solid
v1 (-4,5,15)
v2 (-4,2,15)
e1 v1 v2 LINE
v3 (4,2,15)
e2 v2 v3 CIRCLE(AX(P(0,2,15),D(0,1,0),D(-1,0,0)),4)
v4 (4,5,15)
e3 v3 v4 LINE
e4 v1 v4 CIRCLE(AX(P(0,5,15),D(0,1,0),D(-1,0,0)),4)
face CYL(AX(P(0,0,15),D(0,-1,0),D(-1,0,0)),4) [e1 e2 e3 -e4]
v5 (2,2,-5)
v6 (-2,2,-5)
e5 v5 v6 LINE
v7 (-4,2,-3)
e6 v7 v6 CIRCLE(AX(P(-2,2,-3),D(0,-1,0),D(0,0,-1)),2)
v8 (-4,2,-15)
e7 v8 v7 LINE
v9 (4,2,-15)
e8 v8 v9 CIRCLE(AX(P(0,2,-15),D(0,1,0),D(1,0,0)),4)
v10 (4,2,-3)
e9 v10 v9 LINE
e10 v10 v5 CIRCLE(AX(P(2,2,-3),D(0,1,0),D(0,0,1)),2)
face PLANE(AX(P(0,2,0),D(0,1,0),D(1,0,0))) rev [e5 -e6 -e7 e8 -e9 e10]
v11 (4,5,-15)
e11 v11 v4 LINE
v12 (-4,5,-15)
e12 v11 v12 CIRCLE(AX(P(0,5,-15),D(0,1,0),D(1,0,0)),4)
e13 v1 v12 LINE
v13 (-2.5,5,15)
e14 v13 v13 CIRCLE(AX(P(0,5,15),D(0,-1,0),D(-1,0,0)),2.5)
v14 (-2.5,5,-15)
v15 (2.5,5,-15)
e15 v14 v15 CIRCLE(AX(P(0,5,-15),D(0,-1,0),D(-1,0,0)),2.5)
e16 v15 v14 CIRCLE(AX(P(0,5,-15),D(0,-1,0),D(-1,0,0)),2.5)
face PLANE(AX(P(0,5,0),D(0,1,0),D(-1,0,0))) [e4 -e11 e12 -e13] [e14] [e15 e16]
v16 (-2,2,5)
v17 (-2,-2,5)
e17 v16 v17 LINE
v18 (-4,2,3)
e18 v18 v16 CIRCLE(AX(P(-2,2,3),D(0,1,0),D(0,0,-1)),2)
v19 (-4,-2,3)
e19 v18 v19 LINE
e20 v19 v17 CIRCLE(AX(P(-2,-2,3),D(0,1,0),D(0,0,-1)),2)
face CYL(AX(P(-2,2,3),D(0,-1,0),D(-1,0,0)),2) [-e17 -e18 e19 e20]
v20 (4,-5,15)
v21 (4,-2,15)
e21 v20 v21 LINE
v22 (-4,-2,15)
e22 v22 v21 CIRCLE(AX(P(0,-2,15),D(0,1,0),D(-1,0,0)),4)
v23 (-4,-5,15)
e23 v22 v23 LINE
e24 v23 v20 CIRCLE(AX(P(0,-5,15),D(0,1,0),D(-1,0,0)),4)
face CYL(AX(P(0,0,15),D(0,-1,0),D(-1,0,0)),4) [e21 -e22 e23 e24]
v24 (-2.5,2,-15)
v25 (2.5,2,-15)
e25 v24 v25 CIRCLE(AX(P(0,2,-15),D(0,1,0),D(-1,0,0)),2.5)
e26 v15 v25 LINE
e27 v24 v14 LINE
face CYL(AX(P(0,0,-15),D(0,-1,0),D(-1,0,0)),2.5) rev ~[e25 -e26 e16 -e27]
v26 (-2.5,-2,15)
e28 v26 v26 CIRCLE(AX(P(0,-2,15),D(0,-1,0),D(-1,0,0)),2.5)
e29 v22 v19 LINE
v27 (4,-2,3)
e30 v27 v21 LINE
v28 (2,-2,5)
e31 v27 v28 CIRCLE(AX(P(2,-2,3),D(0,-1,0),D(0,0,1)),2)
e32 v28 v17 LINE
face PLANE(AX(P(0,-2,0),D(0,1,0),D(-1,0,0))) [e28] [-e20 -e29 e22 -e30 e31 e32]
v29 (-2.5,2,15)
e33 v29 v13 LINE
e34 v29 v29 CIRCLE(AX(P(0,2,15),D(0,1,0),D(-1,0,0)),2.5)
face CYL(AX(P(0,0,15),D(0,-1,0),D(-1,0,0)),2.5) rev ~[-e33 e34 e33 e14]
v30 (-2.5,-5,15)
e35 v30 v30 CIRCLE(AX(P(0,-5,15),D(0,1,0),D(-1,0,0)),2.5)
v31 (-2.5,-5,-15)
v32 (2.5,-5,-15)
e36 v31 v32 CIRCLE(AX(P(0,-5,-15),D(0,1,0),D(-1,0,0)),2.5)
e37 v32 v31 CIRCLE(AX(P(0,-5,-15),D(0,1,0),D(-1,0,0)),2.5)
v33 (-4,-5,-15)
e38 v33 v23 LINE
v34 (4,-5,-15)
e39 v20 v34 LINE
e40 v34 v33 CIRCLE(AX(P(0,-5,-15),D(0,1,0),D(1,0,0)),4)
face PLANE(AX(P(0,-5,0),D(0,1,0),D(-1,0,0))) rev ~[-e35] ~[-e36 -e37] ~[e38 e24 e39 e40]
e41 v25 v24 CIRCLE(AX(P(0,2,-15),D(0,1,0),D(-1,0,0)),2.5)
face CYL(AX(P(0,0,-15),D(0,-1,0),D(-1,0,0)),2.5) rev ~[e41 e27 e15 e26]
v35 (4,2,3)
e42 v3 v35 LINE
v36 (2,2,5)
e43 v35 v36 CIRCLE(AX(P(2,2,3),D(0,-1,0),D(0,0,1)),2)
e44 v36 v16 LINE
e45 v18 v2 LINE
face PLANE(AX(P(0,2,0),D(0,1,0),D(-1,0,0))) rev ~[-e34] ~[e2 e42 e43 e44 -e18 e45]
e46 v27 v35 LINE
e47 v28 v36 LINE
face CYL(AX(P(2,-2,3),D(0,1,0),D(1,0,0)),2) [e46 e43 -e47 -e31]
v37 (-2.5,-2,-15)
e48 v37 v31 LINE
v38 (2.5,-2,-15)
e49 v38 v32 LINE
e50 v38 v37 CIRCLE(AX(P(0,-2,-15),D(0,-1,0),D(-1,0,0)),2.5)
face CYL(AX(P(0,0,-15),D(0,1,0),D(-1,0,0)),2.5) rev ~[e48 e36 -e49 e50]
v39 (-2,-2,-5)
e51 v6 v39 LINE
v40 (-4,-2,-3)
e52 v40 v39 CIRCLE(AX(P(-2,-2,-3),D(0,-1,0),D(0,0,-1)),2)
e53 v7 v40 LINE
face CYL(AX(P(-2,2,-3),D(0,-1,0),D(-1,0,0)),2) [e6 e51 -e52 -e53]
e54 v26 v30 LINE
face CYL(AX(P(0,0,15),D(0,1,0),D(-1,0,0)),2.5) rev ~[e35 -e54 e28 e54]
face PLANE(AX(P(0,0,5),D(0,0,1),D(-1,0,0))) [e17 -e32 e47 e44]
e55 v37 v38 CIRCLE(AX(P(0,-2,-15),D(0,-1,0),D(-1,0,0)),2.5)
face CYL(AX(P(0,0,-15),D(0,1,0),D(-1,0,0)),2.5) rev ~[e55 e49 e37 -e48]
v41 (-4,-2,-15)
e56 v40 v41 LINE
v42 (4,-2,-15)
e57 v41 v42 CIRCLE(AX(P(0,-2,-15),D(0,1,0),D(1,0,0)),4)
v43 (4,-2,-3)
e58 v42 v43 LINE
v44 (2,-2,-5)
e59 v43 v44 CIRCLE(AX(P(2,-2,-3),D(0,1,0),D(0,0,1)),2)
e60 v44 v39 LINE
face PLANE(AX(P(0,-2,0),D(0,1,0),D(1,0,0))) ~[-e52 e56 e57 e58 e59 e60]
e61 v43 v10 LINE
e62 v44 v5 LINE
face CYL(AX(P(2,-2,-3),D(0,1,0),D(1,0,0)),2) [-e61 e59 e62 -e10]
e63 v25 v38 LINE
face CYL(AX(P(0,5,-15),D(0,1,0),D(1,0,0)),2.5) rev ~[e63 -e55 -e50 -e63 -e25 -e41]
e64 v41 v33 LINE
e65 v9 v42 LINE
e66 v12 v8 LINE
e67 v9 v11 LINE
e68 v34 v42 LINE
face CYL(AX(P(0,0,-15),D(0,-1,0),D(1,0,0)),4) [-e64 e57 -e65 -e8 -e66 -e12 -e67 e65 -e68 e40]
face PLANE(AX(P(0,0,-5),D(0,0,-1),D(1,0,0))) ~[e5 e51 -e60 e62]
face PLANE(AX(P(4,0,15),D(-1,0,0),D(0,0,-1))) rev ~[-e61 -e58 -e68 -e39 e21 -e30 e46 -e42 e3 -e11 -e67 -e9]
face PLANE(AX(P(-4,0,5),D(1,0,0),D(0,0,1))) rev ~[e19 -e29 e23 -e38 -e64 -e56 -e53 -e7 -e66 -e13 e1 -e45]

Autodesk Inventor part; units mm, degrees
ref_plane "YZ Plane" through (0, 0, 0) normal (1, 0, 0) x (0, 1, 0)
ref_plane "XZ Plane" through (0, 0, 0) normal (0, 1, 0) x (-1, 0, 0)
ref_plane "XY Plane" through (0, 0, 0) normal (0, 0, 1) x (1, 0, 0)
sketch "Szkic1" plane through (0, 0, 0) normal (0, 1, 0) x (-1, 0, 0)
  line L0 (0, 15) -> (0, -15) construction
  line L1 (-4, 15) -> (-4, -15)
  line L2 (4, -15) -> (4, 15)
  arc A0 (4, 15) -> (-4, 15) centre (0, 15) ccw
  arc A1 (-4, -15) -> (4, -15) centre (0, -15) ccw
  circle A2 centre (0, -15) radius 2.5
  circle A3 centre (0, 15) radius 2.5
  line L3 (0, 15) -> (0, 5)
  line L4 (0, 5) -> (4, 5)
  line L5 (0, 5) -> (-4, 5)
  point P0 (0, 0)
  dimension "d0" = 15
  dimension "d1" = 8
  dimension "d2" = 5
  dimension "d3" = 5
  dimension "d6" = 10
extrude "Wyciągnięcie proste1" add sketch "Szkic1" along normal mid plane 10 contours A0 L2 L4 L5 L1 | L5 L4 L2 A1 L1 | A2 | A3
extrude "Wyciągnięcie proste2" cut sketch "Szkic1" along normal mid plane 4 contours A0 L2 L4 L5 L1
extrude "Wyciągnięcie proste3" cut sketch "Szkic1" along normal mid plane 14.5 contours A3
mirror "Odbij1" about plane through (0, 0, 0) normal (0, 0, 1) of "Wyciągnięcie proste2", "Wyciągnięcie proste3"
fillet "Zaokrąglenie1" radius 2 4 edges at (-4, 0, 5) (-4, 0, -5) (4, 0, -5) (4, 0, 5)
sketch "Szkic2" plane through (0, 5, 0) normal (0, 1, 0) x (1, 0, 0)
  circle A0 centre (0, 15) radius 2.5 projected
  circle A1 centre (0, 15) radius 4
  circle A2 centre (0, 15) radius 2.5
  point P0 (0, 0)
extrude "Wyciągnięcie proste4" add sketch "Szkic2" against normal up to surface (10 mm away)
properties part number "connector"
